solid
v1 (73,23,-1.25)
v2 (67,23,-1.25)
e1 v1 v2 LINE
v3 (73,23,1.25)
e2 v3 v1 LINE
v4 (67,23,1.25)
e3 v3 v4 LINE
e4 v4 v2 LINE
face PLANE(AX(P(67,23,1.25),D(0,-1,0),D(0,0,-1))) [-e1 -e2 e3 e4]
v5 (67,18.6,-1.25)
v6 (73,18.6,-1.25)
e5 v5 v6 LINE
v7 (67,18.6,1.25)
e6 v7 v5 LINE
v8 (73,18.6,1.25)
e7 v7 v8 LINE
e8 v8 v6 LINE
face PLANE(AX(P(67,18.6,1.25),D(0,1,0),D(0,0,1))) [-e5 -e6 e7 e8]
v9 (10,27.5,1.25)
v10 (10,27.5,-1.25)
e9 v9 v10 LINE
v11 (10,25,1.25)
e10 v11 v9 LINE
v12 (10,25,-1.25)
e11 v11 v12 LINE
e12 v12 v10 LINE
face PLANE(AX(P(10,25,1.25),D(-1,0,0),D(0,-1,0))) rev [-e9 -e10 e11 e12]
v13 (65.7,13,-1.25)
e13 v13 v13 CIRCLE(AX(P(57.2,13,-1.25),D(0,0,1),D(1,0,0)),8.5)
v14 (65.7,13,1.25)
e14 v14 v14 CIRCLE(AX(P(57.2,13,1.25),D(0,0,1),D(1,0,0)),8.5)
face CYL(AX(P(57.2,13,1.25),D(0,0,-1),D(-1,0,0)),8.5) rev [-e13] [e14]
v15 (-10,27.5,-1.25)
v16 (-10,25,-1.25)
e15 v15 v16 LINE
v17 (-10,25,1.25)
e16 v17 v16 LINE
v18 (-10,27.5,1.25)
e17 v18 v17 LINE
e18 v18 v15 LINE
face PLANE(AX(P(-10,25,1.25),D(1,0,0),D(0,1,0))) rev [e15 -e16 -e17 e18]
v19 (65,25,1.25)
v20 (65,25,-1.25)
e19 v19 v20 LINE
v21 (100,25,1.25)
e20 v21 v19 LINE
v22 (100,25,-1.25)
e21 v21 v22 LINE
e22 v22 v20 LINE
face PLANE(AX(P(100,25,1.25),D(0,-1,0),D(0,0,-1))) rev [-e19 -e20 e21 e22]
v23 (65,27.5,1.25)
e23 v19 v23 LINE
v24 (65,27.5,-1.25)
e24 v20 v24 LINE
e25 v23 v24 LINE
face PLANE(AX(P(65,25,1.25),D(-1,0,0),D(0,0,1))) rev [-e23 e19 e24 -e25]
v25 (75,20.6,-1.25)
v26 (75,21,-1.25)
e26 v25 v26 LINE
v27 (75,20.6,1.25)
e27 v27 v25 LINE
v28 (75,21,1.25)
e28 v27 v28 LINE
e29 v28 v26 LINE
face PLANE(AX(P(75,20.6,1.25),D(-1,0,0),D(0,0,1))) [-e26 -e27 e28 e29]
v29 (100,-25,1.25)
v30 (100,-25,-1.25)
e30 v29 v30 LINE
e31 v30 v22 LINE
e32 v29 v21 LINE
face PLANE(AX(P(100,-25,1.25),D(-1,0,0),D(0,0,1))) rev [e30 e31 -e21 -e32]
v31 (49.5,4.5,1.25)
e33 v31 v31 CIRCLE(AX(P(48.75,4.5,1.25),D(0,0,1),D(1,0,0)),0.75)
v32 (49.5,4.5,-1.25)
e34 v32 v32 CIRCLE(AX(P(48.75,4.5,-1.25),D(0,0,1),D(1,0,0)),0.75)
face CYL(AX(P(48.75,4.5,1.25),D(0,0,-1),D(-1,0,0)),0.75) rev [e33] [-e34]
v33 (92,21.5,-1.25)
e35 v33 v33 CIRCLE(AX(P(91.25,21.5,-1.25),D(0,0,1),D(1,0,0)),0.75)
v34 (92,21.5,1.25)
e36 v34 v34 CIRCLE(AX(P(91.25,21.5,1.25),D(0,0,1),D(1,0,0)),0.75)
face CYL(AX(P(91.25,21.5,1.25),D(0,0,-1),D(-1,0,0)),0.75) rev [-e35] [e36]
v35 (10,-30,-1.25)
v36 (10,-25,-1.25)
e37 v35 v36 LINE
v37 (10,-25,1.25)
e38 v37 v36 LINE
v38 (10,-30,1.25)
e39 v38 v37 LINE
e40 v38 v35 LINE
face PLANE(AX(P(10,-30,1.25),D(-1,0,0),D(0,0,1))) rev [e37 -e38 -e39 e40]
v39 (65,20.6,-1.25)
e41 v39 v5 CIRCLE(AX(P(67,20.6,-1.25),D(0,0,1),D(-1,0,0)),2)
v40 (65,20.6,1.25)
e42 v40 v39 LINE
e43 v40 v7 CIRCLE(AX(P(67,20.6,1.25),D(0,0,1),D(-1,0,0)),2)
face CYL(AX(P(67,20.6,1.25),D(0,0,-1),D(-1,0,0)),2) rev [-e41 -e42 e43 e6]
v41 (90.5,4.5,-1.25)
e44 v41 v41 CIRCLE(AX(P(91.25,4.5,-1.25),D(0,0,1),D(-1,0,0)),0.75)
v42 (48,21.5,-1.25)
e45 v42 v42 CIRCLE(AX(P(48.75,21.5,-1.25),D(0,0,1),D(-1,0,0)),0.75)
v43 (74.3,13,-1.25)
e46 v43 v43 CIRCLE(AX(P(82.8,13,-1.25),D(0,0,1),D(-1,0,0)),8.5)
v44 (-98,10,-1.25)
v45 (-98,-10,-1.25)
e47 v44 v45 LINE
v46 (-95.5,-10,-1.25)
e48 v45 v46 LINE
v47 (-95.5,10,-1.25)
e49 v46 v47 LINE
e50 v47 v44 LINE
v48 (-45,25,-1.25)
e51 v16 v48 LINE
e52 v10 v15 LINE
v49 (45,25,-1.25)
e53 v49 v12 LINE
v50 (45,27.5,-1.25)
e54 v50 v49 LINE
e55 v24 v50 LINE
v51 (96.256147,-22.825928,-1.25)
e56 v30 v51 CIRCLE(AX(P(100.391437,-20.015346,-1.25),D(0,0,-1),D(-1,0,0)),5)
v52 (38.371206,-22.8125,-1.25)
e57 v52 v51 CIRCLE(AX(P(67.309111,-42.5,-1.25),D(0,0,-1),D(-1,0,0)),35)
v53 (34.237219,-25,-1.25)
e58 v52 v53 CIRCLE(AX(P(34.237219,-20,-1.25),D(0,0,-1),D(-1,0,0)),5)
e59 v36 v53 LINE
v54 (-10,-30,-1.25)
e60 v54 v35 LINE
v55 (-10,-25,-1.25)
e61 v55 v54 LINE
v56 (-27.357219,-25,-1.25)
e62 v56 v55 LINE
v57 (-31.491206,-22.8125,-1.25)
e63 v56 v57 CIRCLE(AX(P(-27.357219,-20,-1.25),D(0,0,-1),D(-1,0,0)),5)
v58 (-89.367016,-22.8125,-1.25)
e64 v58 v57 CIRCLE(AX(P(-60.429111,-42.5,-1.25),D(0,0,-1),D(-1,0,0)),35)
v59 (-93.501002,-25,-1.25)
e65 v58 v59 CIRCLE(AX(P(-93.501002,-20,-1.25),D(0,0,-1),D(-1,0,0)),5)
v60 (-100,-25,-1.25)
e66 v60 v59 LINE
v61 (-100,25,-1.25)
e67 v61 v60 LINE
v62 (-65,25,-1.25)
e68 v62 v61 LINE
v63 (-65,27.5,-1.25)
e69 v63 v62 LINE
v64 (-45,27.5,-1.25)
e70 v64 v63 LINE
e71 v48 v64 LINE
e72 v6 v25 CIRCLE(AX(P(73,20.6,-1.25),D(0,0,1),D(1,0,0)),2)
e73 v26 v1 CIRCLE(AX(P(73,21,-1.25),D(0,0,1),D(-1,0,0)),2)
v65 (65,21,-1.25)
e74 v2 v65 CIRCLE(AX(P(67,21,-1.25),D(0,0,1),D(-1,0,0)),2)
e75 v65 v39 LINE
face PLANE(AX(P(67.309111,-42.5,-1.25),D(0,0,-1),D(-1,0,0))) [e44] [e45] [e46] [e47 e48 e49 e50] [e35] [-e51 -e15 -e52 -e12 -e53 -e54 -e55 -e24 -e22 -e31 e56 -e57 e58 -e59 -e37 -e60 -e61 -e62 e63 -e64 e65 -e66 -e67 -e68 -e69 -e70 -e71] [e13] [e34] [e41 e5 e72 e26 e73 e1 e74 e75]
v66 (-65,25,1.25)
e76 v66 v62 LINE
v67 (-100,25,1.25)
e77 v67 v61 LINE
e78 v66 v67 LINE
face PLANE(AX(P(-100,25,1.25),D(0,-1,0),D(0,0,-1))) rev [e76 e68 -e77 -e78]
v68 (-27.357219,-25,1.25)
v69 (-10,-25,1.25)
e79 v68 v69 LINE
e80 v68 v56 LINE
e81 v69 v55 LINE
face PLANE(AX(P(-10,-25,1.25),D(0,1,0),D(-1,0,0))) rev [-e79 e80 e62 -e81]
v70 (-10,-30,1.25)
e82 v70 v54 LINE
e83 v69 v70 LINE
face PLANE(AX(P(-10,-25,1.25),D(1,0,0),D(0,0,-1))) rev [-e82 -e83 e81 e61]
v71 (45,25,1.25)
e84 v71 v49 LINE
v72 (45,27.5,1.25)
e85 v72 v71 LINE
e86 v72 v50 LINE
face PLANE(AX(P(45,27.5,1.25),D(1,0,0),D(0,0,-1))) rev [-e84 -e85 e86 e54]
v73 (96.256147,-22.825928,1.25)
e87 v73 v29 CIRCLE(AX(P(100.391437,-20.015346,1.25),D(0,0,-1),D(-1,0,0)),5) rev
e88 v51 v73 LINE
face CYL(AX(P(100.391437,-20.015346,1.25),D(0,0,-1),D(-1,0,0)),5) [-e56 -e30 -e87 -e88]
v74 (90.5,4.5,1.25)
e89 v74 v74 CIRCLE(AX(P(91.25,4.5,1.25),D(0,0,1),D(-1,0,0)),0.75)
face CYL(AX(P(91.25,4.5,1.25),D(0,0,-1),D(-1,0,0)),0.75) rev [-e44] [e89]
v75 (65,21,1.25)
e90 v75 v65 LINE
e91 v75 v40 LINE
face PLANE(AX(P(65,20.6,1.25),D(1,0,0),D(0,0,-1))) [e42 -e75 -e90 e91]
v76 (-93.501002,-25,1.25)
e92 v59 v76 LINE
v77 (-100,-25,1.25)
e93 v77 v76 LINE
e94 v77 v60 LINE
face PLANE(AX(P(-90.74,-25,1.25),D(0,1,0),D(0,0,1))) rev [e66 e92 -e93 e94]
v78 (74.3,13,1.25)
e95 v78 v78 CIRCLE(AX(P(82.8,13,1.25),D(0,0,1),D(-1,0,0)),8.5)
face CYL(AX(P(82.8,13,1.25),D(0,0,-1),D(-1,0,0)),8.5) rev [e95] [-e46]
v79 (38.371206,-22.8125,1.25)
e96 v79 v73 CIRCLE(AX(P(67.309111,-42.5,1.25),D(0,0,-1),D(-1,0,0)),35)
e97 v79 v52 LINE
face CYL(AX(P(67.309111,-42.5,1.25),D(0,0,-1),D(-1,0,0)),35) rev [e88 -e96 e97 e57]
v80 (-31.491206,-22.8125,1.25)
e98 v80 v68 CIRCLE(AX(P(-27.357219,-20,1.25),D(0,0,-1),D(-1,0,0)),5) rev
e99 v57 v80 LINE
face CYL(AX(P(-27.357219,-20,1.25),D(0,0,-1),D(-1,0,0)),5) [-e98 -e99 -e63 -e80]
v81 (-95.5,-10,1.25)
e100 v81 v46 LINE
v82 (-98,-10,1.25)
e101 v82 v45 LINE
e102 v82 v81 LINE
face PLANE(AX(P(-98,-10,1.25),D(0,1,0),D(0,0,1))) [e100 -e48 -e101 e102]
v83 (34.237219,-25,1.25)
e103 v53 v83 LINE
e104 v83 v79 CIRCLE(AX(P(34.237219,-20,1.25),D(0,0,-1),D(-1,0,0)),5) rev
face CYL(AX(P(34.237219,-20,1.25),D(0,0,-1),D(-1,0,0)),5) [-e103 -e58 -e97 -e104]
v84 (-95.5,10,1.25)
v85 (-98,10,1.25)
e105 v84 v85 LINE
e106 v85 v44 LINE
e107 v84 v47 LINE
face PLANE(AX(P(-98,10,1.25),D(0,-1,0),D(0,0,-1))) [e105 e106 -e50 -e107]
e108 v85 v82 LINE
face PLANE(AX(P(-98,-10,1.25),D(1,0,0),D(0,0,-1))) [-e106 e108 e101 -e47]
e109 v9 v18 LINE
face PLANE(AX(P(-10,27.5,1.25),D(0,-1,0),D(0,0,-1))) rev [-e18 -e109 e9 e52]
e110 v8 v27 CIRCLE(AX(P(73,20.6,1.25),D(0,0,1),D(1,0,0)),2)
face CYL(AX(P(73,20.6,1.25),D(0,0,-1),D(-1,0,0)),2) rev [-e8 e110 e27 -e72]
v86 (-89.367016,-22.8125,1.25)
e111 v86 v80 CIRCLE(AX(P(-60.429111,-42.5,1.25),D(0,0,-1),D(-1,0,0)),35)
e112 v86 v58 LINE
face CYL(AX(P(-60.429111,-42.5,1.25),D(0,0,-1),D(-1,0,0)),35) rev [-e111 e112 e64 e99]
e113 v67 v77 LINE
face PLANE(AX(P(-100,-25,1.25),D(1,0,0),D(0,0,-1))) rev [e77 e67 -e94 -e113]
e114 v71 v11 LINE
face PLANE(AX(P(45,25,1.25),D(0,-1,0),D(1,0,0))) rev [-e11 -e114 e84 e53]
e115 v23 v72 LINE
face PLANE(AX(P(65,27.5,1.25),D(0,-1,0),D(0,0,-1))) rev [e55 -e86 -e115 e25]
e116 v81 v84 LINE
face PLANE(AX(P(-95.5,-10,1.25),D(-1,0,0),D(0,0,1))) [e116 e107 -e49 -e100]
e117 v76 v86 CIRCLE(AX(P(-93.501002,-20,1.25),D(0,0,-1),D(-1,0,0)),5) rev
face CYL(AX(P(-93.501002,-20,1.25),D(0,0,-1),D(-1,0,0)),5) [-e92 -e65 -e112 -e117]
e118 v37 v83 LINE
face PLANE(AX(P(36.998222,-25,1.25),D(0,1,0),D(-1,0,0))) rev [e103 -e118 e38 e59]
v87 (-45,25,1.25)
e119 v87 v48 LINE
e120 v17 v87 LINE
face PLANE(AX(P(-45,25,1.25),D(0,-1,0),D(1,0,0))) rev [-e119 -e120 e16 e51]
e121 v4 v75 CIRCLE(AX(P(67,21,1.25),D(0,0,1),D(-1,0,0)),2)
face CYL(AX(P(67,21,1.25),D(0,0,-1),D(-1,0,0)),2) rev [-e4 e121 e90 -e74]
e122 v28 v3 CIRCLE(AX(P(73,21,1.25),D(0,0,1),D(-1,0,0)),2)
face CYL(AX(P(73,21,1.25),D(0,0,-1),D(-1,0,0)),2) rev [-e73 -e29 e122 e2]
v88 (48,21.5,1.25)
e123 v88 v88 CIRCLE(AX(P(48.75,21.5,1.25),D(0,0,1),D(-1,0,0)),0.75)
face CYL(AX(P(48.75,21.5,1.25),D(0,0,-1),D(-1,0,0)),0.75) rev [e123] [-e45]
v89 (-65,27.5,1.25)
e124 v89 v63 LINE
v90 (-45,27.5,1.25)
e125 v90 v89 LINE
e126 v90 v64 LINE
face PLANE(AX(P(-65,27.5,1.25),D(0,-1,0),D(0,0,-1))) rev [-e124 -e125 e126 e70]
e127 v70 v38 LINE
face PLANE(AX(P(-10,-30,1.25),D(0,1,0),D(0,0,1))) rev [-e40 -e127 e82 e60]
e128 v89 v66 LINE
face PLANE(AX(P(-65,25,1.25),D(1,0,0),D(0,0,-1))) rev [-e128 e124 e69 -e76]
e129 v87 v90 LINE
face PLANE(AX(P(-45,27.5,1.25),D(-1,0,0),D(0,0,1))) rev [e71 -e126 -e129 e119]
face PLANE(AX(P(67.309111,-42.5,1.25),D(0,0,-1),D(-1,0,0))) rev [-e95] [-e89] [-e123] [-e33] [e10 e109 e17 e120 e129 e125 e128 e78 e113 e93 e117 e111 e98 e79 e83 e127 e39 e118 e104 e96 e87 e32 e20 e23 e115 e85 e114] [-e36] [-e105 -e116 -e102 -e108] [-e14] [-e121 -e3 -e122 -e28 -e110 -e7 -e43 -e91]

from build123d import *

# Parameters (mm, degrees)
SKETCH1_R           = 8.5
SKETCH1_R_2         = 0.75
SKETCH1_W           = 2.5
SKETCH1_H           = 20
BOSS_EXTRUDE1_DEPTH = 1.25
FILLET2_R           = 5


with BuildPart() as part:
    # Sketch1 → Boss-Extrude1 (new, symmetric)
    with BuildSketch(Plane.XY):
        with BuildLine():
            Line((-100, -25), (-100, 25))
            Line((-100, 25), (-65, 25))
            Line((-65, 25), (-65, 27.5))
            Line((-65, 27.5), (-45, 27.5))
            Line((-45, 27.5), (-45, 25))
            Line((-45, 25), (-10, 25))
            Line((-10, 25), (-10, 27.5))
            Line((-10, 27.5), (10, 27.5))
            Line((10, 27.5), (10, 25))
            Line((10, 25), (45, 25))
            Line((45, 25), (45, 27.5))
            Line((45, 27.5), (65, 27.5))
            Line((65, 27.5), (65, 25))
            Line((65, 25), (100, 25))
            Line((100, 25), (100, -25))
            Line((100, -25), (97.62, -25))
            ThreePointArc((97.62, -25), (67.309110868, -7.5), (36.998221735, -25))
            Line((36.998221735, -25), (10, -25))
            Line((10, -25), (10, -30))
            Line((10, -30), (-10, -30))
            Line((-10, -30), (-10, -25))
            Line((-10, -25), (-30.118221735, -25))
            ThreePointArc((-30.118221735, -25), (-60.429110868, -7.5), (-90.74, -25))
            Line((-90.74, -25), (-100, -25))
        make_face()
        with Locations((57.2, 13)):
            Circle(SKETCH1_R, mode=Mode.SUBTRACT)
        with Locations((48.75, 4.5)):
            Circle(SKETCH1_R_2, mode=Mode.SUBTRACT)
        with Locations(Location((91.25, 4.5, 0), (0, 0, 180))):
            Circle(SKETCH1_R_2, mode=Mode.SUBTRACT)
        with Locations(Location((82.8, 13, 0), (0, 0, 180))):
            Circle(SKETCH1_R, mode=Mode.SUBTRACT)
        with Locations((91.25, 21.5)):
            Circle(SKETCH1_R_2, mode=Mode.SUBTRACT)
        with Locations(Location((48.75, 21.5, 0), (0, 0, 180))):
            Circle(SKETCH1_R_2, mode=Mode.SUBTRACT)
        with Locations((-96.75, 0)):
            Rectangle(SKETCH1_W, SKETCH1_H, mode=Mode.SUBTRACT)
        with BuildLine():
            Line((67, 18.6), (73, 18.6))
            ThreePointArc((73, 18.6), (74.414213562, 19.185786438), (75, 20.6))
            Line((75, 20.6), (75, 21))
            ThreePointArc((75, 21), (74.414213562, 22.414213562), (73, 23))
            Line((73, 23), (67, 23))
            ThreePointArc((67, 23), (65.585786438, 22.414213562), (65, 21))
            Line((65, 21), (65, 20.6))
            ThreePointArc((65, 20.6), (65.585786438, 19.185786438), (67, 18.6))
        make_face(mode=Mode.SUBTRACT)
    extrude(amount=BOSS_EXTRUDE1_DEPTH, both=True)

    # Fillet2
    # the kernel refuses this fillet: 5 mm, written as the material it takes off along each edge
    with BuildSketch(Plane(origin=(97.62, -25, 7.66613531), x_dir=(-0.5314154668172085, 0.8471113277648036, 0), z_dir=(0, 0, -1))) as fillet2_piece_1:
        with BuildLine():
            CenterArc((2.749772276, 4.996638315), FILLET2_R, 216.591278999, 51.307578807)
            Line((-1.264768811, 2.01612496), (-1.345059633, 1.956514693))
            ThreePointArc((-1.345059633, 1.956514693), (-0.717095538, 0.954920933), (-0.084711133, -0.053141547))
            Line((-0.084711133, -0.053141547), (0.003666363, -0.099932766))
            ThreePointArc((0.003666363, -0.099932766), (1.283227062, -0.076468208), (2.562787761, -0.099932766))
            Line((2.562787761, -0.099932766), (2.566454124, 0))
        make_face()
    extrude(amount=15.332270621, mode=Mode.SUBTRACT)
    with BuildSketch(Plane(origin=(36.998221735, -25, 8.15250564), x_dir=(-1, 0, 0), z_dir=(0, 0, -1)), Plane(origin=(-30.118221735, -25, -8.15250564), x_dir=(1, 0, 0), z_dir=(0, 0, 1))) as fillet2_piece_2:
        with BuildLine():
            CenterArc((2.761002256, 5), FILLET2_R, 214.228866328, 55.771133672)
            Line((-1.372984168, 2.1875), (-1.455663896, 2.13125))
            ThreePointArc((-1.455663896, 2.13125), (-0.751006819, 1.053257332), (-0.08660254, -0.05))
            Line((-0.08660254, -0.05), (0, -0.1))
            Line((0, -0.1), (2.761002256, -0.1))
            Line((2.761002256, -0.1), (2.761002256, 0))
        make_face()
    extrude(amount=16.305011279, mode=Mode.SUBTRACT)
    with BuildSketch(Plane(origin=(-90.74, -25, -8.15250564), x_dir=(-1, 0, 0), z_dir=(0, 0, 1))) as fillet2_piece_3:
        with BuildLine():
            CenterArc((2.761002256, -5), FILLET2_R, 90, 55.771133672)
            Line((-1.372984168, -2.1875), (-1.455663896, -2.13125))
            ThreePointArc((-1.455663896, -2.13125), (-0.751006819, -1.053257332), (-0.08660254, 0.05))
            Line((-0.08660254, 0.05), (0, 0.1))
            Line((0, 0.1), (2.761002256, 0.1))
            Line((2.761002256, 0.1), (2.761002256, 0))
        make_face()
    extrude(amount=16.305011279, mode=Mode.SUBTRACT)


solid = part.part
